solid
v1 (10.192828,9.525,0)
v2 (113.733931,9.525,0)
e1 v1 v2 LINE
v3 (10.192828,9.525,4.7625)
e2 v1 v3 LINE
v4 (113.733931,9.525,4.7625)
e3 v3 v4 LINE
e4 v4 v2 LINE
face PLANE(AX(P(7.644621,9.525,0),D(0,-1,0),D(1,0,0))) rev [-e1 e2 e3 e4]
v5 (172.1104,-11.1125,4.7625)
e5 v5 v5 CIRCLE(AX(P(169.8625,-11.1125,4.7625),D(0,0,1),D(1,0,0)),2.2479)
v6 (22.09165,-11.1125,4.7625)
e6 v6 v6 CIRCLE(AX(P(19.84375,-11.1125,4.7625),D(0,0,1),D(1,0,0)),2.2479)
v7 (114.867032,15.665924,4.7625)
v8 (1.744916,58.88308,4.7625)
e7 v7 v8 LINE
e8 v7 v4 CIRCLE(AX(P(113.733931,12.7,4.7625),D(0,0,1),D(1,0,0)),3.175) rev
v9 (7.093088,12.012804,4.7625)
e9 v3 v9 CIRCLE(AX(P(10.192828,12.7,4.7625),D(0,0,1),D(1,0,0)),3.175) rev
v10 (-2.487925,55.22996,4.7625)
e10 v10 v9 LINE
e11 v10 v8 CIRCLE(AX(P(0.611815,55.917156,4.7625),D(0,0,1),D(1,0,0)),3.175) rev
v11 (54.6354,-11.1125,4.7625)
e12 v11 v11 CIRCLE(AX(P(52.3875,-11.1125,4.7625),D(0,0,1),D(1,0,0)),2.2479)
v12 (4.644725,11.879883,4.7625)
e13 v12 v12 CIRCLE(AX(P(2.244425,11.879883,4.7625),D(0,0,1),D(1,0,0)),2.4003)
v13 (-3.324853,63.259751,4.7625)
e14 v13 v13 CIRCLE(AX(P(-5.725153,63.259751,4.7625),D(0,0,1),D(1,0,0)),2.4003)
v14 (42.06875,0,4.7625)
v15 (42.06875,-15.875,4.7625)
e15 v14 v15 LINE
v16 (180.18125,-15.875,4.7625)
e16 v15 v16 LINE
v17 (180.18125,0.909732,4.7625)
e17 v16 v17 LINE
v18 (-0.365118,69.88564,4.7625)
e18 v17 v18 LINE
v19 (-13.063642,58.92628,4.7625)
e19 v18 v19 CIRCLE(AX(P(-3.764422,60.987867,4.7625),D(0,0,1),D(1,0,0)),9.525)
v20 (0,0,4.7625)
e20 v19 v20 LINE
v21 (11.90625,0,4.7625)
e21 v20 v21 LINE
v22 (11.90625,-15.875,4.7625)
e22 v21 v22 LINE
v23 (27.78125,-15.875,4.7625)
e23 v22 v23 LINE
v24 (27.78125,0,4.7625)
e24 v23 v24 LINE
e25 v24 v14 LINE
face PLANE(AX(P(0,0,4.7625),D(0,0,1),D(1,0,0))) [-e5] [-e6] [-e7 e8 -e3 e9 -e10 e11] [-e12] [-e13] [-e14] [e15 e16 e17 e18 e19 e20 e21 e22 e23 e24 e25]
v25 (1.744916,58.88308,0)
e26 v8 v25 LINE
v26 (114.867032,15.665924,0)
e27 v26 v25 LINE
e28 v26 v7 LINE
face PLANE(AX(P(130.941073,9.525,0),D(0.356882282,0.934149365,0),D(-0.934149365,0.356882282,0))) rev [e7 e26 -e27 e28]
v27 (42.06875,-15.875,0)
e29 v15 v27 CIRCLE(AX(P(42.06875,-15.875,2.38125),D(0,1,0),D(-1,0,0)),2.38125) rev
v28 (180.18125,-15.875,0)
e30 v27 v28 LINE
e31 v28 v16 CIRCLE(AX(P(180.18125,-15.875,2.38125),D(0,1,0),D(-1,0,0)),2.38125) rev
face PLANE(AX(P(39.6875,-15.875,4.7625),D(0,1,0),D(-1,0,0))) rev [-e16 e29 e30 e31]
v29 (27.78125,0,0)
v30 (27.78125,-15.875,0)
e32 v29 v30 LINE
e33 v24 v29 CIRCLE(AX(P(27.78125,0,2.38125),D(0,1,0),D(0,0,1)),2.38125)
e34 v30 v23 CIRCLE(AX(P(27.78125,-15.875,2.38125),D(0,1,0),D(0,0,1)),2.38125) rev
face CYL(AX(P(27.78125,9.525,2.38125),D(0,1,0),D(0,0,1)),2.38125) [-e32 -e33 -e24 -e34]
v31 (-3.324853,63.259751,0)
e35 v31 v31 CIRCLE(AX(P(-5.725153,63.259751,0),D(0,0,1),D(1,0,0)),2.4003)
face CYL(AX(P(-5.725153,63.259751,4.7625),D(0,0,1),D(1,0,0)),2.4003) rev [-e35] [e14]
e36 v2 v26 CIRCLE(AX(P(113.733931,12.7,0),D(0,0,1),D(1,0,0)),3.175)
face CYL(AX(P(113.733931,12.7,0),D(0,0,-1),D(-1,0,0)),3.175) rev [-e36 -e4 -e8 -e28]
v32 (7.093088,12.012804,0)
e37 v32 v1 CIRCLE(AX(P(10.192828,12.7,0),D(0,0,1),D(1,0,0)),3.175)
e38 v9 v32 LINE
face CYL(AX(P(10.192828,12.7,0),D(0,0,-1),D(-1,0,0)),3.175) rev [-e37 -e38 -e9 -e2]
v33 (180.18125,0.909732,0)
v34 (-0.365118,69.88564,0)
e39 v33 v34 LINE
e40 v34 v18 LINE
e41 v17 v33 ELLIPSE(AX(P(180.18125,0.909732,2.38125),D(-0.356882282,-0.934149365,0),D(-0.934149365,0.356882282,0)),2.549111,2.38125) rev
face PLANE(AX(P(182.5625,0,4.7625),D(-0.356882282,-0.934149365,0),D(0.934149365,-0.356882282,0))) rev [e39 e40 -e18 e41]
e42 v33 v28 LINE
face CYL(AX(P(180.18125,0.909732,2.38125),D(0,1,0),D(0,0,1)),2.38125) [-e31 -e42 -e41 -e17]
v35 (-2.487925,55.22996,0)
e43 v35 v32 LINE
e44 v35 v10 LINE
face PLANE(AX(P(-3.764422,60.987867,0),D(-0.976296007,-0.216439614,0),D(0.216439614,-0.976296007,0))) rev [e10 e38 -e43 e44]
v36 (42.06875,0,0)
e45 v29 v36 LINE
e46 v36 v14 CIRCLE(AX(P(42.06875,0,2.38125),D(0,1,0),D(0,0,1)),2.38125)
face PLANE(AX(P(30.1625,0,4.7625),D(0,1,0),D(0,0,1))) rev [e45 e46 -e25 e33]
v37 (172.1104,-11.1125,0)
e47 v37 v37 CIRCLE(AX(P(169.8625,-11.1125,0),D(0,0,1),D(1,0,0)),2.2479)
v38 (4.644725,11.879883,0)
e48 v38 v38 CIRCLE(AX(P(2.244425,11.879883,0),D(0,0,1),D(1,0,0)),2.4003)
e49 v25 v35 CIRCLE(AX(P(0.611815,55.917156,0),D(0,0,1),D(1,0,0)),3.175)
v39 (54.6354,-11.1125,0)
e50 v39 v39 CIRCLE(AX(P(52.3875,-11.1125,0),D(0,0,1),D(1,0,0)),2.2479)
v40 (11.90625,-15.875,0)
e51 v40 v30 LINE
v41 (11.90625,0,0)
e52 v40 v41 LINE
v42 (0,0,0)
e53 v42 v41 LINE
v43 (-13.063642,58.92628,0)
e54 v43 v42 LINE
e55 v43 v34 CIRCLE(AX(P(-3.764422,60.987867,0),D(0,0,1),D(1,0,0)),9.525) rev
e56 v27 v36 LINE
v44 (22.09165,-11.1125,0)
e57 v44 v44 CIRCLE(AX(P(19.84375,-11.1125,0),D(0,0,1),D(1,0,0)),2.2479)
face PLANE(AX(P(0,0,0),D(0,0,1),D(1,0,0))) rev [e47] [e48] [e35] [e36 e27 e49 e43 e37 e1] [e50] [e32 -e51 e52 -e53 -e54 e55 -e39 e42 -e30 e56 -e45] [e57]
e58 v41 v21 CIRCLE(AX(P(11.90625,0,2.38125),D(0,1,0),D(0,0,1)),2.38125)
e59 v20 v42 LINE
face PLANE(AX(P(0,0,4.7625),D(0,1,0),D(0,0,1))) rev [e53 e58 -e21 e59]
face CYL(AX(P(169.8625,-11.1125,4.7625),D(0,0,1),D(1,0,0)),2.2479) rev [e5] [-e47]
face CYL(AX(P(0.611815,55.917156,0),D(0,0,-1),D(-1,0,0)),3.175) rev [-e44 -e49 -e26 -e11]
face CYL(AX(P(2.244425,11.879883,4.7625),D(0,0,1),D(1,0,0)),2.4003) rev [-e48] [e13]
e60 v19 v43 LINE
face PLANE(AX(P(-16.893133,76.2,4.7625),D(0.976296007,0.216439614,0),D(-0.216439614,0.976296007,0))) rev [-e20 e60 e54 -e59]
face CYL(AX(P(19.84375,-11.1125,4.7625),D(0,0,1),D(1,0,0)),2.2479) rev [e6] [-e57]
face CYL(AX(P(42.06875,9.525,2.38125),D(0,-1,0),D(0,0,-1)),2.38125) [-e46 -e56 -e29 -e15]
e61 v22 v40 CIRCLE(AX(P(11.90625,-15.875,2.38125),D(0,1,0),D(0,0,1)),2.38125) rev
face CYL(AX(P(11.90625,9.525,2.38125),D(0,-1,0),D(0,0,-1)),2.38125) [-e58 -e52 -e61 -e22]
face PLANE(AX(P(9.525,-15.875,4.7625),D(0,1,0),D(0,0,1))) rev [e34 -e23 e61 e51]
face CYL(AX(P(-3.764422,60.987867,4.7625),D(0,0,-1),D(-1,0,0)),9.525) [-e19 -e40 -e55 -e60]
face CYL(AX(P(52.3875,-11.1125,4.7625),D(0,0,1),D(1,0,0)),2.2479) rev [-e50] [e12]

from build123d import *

# Parameters (mm, degrees)
BOSS_EXTRUDE1_DEPTH         = 4.7625
CUT_EXTRUDE1_DEPTH          = 198.884278841
FILLET1_R                   = 3.175
FILLET2_R                   = 9.525
F_12_0_189_DIAMETER_HOLE1_D = 4.8006
F_8_CLEARANCE_HOLE1_D       = 4.4958
FILLET3_RADIUS              = 2.38125
FILLET3_LENGTH              = 15.875
FILLET4_RADIUS              = 2.38125
FILLET4_LENGTH              = 15.875
FILLET5_RADIUS              = 2.38125
FILLET5_LENGTH              = 15.875
FILLET6_START               = -17
FILLET6_DEPTH               = 19


with BuildPart() as part:
    # Sketch1 → Boss-Extrude1 (new body)
    with BuildSketch(Plane.XY):
        Polygon((0, 0), (9.525, 0), (9.525, -15.875), (30.1625, -15.875), (30.1625, 0), (39.6875, 0), (39.6875, -15.875), (182.5625, -15.875), (182.5625, 0), (-16.893133293, 76.2), align=None)
    extrude(amount=BOSS_EXTRUDE1_DEPTH)

    # Sketch2 → Cut-Extrude1 (cut, through all)
    with BuildSketch(Plane.XY.offset(4.7625)):
        Polygon((7.644620712, 9.525), (130.941072945, 9.525), (-3.76442223, 60.987867019), align=None)
    extrude(amount=-CUT_EXTRUDE1_DEPTH, mode=Mode.SUBTRACT)

    # Fillet1
    fillet1_edges = [part.edges().sort_by_distance(p)[0] for p in [
        (7.644620712, 9.525, 2.38125),
        (-3.76442223, 60.987867019, 2.38125),
        (130.941072945, 9.525, 2.38125),
    ]]
    fillet(fillet1_edges, radius=FILLET1_R)

    # Fillet2
    fillet2_edges = [part.edges().sort_by_distance(p)[0] for p in [
        (-16.893133293, 76.2, 2.38125),
    ]]
    fillet(fillet2_edges, radius=FILLET2_R)

    # #12 (0.189) Diameter Hole1 (through all)
    with Locations(Plane.XY.offset(4.7625)):
        with Locations((-5.72515333, 63.259750533), (2.244424524, 11.879883041)):
            Hole(F_12_0_189_DIAMETER_HOLE1_D / 2)

    # #8 Clearance Hole1 (through all)
    with Locations(Plane.XY.offset(4.7625)):
        with Locations((19.84375, -11.1125), (52.3875, -11.1125), (169.8625, -11.1125)):
            Hole(F_8_CLEARANCE_HOLE1_D / 2)

    # Fillet3: full round fillet: the end face becomes a half cylinder, R = half its width
    fillet3_face = Plane((9.525, -7.9375, 2.38125), x_dir=(0, 1, 0), z_dir=(-1, 0, 0))  # on the end face: x along it, z out of the body
    fillet3_slab = fillet3_face.offset(-FILLET3_RADIUS / 2) * Box(FILLET3_LENGTH, 2 * FILLET3_RADIUS, FILLET3_RADIUS, mode=Mode.PRIVATE)  # the body's end, R deep
    fillet3_round = Plane((11.90625, -7.9375, 2.38125), x_dir=(-1, 0, 0), z_dir=(0, 1, 0)) * Cylinder(FILLET3_RADIUS, FILLET3_LENGTH, mode=Mode.PRIVATE)  # its axis R under the face
    add(fillet3_slab - fillet3_round, mode=Mode.SUBTRACT)

    # Fillet4: full round fillet: the end face becomes a half cylinder, R = half its width
    fillet4_face = Plane((30.1625, -7.9375, 2.38125), x_dir=(0, 1, 0), z_dir=(1, 0, 0))  # on the end face: x along it, z out of the body
    fillet4_slab = fillet4_face.offset(-FILLET4_RADIUS / 2) * Box(FILLET4_LENGTH, 2 * FILLET4_RADIUS, FILLET4_RADIUS, mode=Mode.PRIVATE)  # the body's end, R deep
    fillet4_round = Plane((27.78125, -7.9375, 2.38125), x_dir=(1, 0, 0), z_dir=(0, 1, 0)) * Cylinder(FILLET4_RADIUS, FILLET4_LENGTH, mode=Mode.PRIVATE)  # its axis R under the face
    add(fillet4_slab - fillet4_round, mode=Mode.SUBTRACT)

    # Fillet5: full round fillet: the end face becomes a half cylinder, R = half its width
    fillet5_face = Plane((39.6875, -7.9375, 2.38125), x_dir=(0, -1, 0), z_dir=(-1, 0, 0))  # on the end face: x along it, z out of the body
    fillet5_slab = fillet5_face.offset(-FILLET5_RADIUS / 2) * Box(FILLET5_LENGTH, 2 * FILLET5_RADIUS, FILLET5_RADIUS, mode=Mode.PRIVATE)  # the body's end, R deep
    fillet5_round = Plane((42.06875, -7.9375, 2.38125), x_dir=(-1, 0, 0), z_dir=(0, -1, 0)) * Cylinder(FILLET5_RADIUS, FILLET5_LENGTH, mode=Mode.PRIVATE)  # its axis R under the face
    add(fillet5_slab - fillet5_round, mode=Mode.SUBTRACT)

    # Fillet6: read off the stored shape, not the designer's step
    # Fillet6 outline → Fillet6 (cut)
    with BuildSketch(Plane(origin=(0, 0, 0), x_dir=(1, 0, 0), z_dir=(0, 1, 0)).offset(FILLET6_START)):
        with BuildLine():
            ThreePointArc((180.18125, 0), (181.865048023, -0.697451977), (182.5625, -2.38125))
            Line((182.5625, -2.38125), (182.5625, 0))
            Line((182.5625, 0), (180.18125, 0))
        make_face()
        with BuildLine():
            ThreePointArc((182.5625, -2.38125), (181.865048023, -4.065048023), (180.18125, -4.7625))
            Line((180.18125, -4.7625), (182.5625, -4.7625))
            Line((182.5625, -4.7625), (182.5625, -2.38125))
        make_face()
    extrude(amount=FILLET6_DEPTH, mode=Mode.SUBTRACT)


solid = part.part
